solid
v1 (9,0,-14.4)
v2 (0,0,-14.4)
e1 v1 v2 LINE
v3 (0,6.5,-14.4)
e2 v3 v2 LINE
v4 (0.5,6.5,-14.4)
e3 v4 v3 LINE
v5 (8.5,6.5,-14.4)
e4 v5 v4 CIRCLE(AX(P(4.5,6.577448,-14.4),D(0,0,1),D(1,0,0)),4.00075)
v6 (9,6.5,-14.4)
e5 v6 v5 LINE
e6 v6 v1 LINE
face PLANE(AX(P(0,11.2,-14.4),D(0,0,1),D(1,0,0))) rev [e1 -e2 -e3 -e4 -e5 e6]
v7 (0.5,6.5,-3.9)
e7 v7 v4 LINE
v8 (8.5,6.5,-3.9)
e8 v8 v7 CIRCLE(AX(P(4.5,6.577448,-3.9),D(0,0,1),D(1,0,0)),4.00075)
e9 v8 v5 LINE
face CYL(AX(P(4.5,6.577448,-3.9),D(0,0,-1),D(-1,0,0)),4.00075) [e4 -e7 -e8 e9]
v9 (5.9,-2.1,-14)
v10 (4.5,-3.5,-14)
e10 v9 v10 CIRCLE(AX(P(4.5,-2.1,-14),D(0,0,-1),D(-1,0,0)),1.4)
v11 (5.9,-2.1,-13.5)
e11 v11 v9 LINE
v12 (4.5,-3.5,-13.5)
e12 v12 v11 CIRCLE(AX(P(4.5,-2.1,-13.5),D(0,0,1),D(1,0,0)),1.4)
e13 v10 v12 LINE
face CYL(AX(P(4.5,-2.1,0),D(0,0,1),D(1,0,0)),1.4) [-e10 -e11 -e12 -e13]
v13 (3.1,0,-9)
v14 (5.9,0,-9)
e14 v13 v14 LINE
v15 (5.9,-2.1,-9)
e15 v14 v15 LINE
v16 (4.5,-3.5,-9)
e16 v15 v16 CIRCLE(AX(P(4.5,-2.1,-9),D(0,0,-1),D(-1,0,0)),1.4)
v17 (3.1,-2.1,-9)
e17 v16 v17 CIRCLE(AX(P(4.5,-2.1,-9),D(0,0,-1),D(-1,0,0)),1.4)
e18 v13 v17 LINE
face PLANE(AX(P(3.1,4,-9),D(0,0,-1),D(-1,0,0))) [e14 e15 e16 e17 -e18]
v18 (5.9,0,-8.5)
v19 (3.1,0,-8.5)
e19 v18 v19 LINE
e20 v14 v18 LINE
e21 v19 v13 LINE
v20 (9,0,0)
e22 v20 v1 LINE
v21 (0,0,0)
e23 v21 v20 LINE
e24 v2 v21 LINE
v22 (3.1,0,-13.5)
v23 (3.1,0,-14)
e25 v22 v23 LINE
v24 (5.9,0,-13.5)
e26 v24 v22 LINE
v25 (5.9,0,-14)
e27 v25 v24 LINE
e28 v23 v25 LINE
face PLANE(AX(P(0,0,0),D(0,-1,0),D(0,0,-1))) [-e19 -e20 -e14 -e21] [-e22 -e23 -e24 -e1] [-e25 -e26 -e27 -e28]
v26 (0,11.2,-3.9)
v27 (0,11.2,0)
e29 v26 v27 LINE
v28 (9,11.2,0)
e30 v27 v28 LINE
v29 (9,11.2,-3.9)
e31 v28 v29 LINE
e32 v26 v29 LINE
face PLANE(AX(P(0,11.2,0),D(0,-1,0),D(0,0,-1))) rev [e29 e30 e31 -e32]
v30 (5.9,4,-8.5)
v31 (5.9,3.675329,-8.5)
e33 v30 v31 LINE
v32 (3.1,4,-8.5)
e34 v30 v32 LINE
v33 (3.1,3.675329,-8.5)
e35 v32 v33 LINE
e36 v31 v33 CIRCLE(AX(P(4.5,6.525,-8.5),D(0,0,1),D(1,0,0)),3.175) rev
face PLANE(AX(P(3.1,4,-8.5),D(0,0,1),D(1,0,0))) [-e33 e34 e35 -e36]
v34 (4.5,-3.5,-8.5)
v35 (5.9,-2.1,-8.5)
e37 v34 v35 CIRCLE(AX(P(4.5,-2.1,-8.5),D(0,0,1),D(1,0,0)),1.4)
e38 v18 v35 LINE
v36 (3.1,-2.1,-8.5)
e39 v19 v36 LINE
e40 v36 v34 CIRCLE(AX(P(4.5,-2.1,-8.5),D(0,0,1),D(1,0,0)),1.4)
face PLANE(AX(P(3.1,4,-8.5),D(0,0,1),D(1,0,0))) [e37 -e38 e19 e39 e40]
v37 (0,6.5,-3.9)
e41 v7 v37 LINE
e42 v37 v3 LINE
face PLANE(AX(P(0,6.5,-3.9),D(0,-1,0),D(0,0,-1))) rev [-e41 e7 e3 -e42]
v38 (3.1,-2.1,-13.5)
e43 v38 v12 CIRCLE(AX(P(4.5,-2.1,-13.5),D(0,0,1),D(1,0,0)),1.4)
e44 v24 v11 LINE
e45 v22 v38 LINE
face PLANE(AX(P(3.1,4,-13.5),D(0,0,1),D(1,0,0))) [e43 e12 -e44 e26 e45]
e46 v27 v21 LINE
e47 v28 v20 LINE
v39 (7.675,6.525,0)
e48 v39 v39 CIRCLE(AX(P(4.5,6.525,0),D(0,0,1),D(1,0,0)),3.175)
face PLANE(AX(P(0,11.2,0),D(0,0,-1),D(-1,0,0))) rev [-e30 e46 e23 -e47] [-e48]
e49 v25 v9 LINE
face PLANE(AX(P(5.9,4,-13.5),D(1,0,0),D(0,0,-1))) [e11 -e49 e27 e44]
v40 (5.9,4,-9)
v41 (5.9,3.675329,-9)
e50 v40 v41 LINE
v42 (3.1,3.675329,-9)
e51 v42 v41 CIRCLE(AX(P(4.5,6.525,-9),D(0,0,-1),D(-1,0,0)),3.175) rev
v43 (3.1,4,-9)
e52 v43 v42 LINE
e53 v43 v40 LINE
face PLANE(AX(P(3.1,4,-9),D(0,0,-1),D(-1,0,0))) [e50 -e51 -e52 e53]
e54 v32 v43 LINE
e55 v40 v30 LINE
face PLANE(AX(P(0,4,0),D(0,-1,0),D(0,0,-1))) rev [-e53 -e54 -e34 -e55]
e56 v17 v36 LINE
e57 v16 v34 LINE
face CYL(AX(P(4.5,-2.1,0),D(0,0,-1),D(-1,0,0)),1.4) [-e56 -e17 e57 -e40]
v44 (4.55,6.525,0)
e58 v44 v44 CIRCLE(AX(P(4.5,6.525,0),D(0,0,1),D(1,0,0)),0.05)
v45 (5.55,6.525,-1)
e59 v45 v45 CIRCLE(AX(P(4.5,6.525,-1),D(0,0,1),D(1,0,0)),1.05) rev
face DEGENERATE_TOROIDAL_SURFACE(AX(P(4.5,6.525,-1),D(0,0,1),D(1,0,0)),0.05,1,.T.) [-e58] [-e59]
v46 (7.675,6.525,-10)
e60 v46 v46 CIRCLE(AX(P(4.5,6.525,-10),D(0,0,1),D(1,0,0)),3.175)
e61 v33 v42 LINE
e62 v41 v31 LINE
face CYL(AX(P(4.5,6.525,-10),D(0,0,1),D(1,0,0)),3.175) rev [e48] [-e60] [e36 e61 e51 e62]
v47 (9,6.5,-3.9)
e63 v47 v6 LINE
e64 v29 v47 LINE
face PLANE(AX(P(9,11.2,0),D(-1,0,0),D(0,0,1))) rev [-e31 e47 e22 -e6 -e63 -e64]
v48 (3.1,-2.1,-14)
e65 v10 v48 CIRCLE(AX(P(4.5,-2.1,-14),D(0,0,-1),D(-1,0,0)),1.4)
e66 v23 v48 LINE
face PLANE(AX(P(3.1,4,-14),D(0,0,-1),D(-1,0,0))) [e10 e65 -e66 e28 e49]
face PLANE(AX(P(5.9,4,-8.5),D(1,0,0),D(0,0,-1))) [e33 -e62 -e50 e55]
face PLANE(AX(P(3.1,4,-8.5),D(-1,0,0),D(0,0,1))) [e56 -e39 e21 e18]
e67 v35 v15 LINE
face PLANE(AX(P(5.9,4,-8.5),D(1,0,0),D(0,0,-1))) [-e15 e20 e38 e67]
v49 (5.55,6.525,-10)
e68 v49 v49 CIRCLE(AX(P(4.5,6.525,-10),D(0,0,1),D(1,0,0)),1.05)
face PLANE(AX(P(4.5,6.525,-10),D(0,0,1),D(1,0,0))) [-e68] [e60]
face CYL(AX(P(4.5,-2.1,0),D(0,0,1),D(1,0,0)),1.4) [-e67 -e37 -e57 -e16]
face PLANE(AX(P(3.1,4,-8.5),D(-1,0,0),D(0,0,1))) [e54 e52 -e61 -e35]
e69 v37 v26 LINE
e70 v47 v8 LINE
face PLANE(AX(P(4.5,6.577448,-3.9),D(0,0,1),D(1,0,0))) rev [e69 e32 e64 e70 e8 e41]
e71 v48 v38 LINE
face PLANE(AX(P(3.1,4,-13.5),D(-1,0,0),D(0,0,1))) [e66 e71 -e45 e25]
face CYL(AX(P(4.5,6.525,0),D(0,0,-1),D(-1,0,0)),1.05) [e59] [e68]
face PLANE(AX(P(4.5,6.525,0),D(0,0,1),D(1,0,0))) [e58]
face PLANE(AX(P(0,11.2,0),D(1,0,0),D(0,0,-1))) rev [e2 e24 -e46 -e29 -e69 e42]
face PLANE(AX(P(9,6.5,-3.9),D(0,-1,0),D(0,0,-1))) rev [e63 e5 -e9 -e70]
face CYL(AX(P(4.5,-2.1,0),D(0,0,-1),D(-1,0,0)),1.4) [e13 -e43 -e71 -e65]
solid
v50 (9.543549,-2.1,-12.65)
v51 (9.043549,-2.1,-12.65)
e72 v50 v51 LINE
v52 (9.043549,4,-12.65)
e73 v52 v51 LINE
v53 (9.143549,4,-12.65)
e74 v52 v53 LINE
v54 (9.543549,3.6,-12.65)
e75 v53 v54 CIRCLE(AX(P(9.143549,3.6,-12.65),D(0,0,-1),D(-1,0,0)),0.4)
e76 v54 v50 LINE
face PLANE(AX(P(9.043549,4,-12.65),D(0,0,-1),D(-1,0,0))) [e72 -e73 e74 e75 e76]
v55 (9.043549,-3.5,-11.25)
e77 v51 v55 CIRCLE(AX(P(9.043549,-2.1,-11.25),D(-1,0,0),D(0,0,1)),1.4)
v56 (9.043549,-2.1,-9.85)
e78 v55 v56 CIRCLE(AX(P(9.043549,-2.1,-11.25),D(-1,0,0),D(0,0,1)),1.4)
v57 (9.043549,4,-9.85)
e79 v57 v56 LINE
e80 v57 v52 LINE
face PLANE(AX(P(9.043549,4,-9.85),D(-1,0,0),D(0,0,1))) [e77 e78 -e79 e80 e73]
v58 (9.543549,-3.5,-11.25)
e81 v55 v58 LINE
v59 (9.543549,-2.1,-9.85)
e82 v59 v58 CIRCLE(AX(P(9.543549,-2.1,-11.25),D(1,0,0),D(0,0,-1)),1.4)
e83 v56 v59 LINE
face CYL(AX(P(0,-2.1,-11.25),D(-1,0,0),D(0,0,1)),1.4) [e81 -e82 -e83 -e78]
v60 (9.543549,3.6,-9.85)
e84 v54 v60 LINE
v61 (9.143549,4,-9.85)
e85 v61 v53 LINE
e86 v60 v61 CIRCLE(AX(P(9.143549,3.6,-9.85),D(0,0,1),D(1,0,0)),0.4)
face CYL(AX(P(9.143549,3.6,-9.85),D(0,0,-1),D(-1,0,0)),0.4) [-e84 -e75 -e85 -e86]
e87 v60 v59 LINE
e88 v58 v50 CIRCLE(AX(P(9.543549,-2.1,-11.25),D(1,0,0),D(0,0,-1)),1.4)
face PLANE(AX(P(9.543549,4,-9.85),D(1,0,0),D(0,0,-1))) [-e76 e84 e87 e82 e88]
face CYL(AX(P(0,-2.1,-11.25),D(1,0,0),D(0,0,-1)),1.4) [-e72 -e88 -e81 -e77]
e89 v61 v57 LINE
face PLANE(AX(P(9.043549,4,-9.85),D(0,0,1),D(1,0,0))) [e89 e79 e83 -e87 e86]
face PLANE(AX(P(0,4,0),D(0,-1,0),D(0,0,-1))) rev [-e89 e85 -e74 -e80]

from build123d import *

# Parameters (mm, degrees)
SCHIZZO1_W                        = 9
SCHIZZO1_H                        = 14.4
ESTRUSIONE_ESTRUSIONE1_DEPTH      = 11.2
SCHIZZO2_R                        = 3.175
TAGLIO_ESTRUSIONE1_DEPTH          = 10
SCHIZZO3_R                        = 1.05
ESTRUSIONE_ESTRUSIONE2_DEPTH      = 10
RACCORDO1_R                       = 1
TAGLIO_ESTRUSIONE2_DEPTH          = 10.5
ESTRUSIONE_ESTRUSIONE3_DEPTH      = 3.5
ESTRUSIONE_ESTRUSIONE3_DEPTH_BACK = 4
SCHIZZO5_W                        = 2.8
SCHIZZO5_H                        = 0.5
SCHIZZO5_W_2                      = 0.5
SCHIZZO5_H_2                      = 2.8
RACCORDO2_R                       = 0.4
RACCORDO3_R                       = 1.4
RACCORDO4_R                       = 1.4
RACCORDO5_R                       = 1.4


with BuildPart() as part:
    # Schizzo1 → Estrusione-Estrusione1 (new body)
    with BuildSketch(Plane(origin=(0, 0, 0), x_dir=(1, 0, 0), z_dir=(0, 1, 0))):
        with Locations((4.5, 7.2)):
            Rectangle(SCHIZZO1_W, SCHIZZO1_H)
    extrude(amount=ESTRUSIONE_ESTRUSIONE1_DEPTH)

    # Schizzo2 → Taglio-Estrusione1 (cut)
    with BuildSketch(Plane.XY):
        with Locations((4.5, 6.525)):
            Circle(SCHIZZO2_R)
    extrude(amount=-TAGLIO_ESTRUSIONE1_DEPTH, mode=Mode.SUBTRACT)

    # Schizzo3 → Estrusione-Estrusione2 (add)
    with BuildSketch(Plane.XY.offset(-10)):
        with Locations((4.5, 6.525)):
            Circle(SCHIZZO3_R)
    extrude(amount=ESTRUSIONE_ESTRUSIONE2_DEPTH)

    # Raccordo1
    raccordo1_edges = [part.edges().sort_by_distance(p)[0] for p in [
        (3.45, 6.525, 0),
    ]]
    fillet(raccordo1_edges, radius=RACCORDO1_R)

    # Schizzo4 → Taglio-Estrusione2 (cut)
    with BuildSketch(Plane(origin=(0, 0, -14.4), x_dir=(-1, 0, 0), z_dir=(0, 0, -1))):
        with BuildLine():
            Line((-9, 6.5), (-9, 11.2))
            Line((-9, 11.2), (0, 11.2))
            Line((0, 11.2), (0, 6.5))
            Line((0, 6.5), (-0.5, 6.5))
            ThreePointArc((-0.5, 6.5), (-4.5, 10.578198038), (-8.5, 6.5))
            Line((-8.5, 6.5), (-9, 6.5))
        make_face()
    extrude(amount=-TAGLIO_ESTRUSIONE2_DEPTH, mode=Mode.SUBTRACT)

    # Schizzo5 → Estrusione-Estrusione3 (add, two sides: drawn at the far end of the back side and taken through both)
    with BuildSketch(Plane(origin=(0, 0, 0), x_dir=(-1, 0, 0), z_dir=(0, -1, 0)).offset(-ESTRUSIONE_ESTRUSIONE3_DEPTH_BACK)):
        with Locations((-4.5, 8.75)):
            Rectangle(SCHIZZO5_W, SCHIZZO5_H)
        with Locations((-4.5, 13.75)):
            Rectangle(SCHIZZO5_W, SCHIZZO5_H)
        with Locations((-9.293549244, 11.25)):
            Rectangle(SCHIZZO5_W_2, SCHIZZO5_H_2)
    extrude(amount=ESTRUSIONE_ESTRUSIONE3_DEPTH + ESTRUSIONE_ESTRUSIONE3_DEPTH_BACK)


with BuildPart() as estrusione_estrusione3_piece_1:
    # of the separate pieces the step leaves, piece 1, a body of its own (estrusione_estrusione3_pieces)
    add(part.part.solids().sort_by_distance((5.55, 6.525, -1))[0])

    # Raccordo4
    raccordo4_edges = [estrusione_estrusione3_piece_1.edges().sort_by_distance(p)[0] for p in [
        (3.1, -3.5, -13.75),
        (5.9, -3.5, -13.75),
    ]]
    fillet(raccordo4_edges, radius=RACCORDO4_R - 0.0001)  # a hair under: the kernel refuses the full size

    # Raccordo5
    raccordo5_edges = [estrusione_estrusione3_piece_1.edges().sort_by_distance(p)[0] for p in [
        (3.1, -3.5, -8.75),
        (5.9, -3.5, -8.75),
    ]]
    fillet(raccordo5_edges, radius=RACCORDO5_R - 0.0001)  # a hair under: the kernel refuses the full size


with BuildPart() as estrusione_estrusione3_piece_2:
    # of the separate pieces the step leaves, piece 2, a body of its own (estrusione_estrusione3_pieces)
    add(part.part.solids().sort_by_distance((9.043549244, -3.5, -9.85))[0])

    # Raccordo2
    raccordo2_edges = [estrusione_estrusione3_piece_2.edges().sort_by_distance(p)[0] for p in [
        (9.543549244, 4, -11.25),
    ]]
    fillet(raccordo2_edges, radius=RACCORDO2_R)

    # Raccordo3
    raccordo3_edges = [estrusione_estrusione3_piece_2.edges().sort_by_distance(p)[0] for p in [
        (9.293549244, -3.5, -9.85),
        (9.293549244, -3.5, -12.65),
    ]]
    fillet(raccordo3_edges, radius=RACCORDO3_R - 0.0001)  # a hair under: the kernel refuses the full size


solid = Compound([estrusione_estrusione3_piece_1.part, estrusione_estrusione3_piece_2.part])
